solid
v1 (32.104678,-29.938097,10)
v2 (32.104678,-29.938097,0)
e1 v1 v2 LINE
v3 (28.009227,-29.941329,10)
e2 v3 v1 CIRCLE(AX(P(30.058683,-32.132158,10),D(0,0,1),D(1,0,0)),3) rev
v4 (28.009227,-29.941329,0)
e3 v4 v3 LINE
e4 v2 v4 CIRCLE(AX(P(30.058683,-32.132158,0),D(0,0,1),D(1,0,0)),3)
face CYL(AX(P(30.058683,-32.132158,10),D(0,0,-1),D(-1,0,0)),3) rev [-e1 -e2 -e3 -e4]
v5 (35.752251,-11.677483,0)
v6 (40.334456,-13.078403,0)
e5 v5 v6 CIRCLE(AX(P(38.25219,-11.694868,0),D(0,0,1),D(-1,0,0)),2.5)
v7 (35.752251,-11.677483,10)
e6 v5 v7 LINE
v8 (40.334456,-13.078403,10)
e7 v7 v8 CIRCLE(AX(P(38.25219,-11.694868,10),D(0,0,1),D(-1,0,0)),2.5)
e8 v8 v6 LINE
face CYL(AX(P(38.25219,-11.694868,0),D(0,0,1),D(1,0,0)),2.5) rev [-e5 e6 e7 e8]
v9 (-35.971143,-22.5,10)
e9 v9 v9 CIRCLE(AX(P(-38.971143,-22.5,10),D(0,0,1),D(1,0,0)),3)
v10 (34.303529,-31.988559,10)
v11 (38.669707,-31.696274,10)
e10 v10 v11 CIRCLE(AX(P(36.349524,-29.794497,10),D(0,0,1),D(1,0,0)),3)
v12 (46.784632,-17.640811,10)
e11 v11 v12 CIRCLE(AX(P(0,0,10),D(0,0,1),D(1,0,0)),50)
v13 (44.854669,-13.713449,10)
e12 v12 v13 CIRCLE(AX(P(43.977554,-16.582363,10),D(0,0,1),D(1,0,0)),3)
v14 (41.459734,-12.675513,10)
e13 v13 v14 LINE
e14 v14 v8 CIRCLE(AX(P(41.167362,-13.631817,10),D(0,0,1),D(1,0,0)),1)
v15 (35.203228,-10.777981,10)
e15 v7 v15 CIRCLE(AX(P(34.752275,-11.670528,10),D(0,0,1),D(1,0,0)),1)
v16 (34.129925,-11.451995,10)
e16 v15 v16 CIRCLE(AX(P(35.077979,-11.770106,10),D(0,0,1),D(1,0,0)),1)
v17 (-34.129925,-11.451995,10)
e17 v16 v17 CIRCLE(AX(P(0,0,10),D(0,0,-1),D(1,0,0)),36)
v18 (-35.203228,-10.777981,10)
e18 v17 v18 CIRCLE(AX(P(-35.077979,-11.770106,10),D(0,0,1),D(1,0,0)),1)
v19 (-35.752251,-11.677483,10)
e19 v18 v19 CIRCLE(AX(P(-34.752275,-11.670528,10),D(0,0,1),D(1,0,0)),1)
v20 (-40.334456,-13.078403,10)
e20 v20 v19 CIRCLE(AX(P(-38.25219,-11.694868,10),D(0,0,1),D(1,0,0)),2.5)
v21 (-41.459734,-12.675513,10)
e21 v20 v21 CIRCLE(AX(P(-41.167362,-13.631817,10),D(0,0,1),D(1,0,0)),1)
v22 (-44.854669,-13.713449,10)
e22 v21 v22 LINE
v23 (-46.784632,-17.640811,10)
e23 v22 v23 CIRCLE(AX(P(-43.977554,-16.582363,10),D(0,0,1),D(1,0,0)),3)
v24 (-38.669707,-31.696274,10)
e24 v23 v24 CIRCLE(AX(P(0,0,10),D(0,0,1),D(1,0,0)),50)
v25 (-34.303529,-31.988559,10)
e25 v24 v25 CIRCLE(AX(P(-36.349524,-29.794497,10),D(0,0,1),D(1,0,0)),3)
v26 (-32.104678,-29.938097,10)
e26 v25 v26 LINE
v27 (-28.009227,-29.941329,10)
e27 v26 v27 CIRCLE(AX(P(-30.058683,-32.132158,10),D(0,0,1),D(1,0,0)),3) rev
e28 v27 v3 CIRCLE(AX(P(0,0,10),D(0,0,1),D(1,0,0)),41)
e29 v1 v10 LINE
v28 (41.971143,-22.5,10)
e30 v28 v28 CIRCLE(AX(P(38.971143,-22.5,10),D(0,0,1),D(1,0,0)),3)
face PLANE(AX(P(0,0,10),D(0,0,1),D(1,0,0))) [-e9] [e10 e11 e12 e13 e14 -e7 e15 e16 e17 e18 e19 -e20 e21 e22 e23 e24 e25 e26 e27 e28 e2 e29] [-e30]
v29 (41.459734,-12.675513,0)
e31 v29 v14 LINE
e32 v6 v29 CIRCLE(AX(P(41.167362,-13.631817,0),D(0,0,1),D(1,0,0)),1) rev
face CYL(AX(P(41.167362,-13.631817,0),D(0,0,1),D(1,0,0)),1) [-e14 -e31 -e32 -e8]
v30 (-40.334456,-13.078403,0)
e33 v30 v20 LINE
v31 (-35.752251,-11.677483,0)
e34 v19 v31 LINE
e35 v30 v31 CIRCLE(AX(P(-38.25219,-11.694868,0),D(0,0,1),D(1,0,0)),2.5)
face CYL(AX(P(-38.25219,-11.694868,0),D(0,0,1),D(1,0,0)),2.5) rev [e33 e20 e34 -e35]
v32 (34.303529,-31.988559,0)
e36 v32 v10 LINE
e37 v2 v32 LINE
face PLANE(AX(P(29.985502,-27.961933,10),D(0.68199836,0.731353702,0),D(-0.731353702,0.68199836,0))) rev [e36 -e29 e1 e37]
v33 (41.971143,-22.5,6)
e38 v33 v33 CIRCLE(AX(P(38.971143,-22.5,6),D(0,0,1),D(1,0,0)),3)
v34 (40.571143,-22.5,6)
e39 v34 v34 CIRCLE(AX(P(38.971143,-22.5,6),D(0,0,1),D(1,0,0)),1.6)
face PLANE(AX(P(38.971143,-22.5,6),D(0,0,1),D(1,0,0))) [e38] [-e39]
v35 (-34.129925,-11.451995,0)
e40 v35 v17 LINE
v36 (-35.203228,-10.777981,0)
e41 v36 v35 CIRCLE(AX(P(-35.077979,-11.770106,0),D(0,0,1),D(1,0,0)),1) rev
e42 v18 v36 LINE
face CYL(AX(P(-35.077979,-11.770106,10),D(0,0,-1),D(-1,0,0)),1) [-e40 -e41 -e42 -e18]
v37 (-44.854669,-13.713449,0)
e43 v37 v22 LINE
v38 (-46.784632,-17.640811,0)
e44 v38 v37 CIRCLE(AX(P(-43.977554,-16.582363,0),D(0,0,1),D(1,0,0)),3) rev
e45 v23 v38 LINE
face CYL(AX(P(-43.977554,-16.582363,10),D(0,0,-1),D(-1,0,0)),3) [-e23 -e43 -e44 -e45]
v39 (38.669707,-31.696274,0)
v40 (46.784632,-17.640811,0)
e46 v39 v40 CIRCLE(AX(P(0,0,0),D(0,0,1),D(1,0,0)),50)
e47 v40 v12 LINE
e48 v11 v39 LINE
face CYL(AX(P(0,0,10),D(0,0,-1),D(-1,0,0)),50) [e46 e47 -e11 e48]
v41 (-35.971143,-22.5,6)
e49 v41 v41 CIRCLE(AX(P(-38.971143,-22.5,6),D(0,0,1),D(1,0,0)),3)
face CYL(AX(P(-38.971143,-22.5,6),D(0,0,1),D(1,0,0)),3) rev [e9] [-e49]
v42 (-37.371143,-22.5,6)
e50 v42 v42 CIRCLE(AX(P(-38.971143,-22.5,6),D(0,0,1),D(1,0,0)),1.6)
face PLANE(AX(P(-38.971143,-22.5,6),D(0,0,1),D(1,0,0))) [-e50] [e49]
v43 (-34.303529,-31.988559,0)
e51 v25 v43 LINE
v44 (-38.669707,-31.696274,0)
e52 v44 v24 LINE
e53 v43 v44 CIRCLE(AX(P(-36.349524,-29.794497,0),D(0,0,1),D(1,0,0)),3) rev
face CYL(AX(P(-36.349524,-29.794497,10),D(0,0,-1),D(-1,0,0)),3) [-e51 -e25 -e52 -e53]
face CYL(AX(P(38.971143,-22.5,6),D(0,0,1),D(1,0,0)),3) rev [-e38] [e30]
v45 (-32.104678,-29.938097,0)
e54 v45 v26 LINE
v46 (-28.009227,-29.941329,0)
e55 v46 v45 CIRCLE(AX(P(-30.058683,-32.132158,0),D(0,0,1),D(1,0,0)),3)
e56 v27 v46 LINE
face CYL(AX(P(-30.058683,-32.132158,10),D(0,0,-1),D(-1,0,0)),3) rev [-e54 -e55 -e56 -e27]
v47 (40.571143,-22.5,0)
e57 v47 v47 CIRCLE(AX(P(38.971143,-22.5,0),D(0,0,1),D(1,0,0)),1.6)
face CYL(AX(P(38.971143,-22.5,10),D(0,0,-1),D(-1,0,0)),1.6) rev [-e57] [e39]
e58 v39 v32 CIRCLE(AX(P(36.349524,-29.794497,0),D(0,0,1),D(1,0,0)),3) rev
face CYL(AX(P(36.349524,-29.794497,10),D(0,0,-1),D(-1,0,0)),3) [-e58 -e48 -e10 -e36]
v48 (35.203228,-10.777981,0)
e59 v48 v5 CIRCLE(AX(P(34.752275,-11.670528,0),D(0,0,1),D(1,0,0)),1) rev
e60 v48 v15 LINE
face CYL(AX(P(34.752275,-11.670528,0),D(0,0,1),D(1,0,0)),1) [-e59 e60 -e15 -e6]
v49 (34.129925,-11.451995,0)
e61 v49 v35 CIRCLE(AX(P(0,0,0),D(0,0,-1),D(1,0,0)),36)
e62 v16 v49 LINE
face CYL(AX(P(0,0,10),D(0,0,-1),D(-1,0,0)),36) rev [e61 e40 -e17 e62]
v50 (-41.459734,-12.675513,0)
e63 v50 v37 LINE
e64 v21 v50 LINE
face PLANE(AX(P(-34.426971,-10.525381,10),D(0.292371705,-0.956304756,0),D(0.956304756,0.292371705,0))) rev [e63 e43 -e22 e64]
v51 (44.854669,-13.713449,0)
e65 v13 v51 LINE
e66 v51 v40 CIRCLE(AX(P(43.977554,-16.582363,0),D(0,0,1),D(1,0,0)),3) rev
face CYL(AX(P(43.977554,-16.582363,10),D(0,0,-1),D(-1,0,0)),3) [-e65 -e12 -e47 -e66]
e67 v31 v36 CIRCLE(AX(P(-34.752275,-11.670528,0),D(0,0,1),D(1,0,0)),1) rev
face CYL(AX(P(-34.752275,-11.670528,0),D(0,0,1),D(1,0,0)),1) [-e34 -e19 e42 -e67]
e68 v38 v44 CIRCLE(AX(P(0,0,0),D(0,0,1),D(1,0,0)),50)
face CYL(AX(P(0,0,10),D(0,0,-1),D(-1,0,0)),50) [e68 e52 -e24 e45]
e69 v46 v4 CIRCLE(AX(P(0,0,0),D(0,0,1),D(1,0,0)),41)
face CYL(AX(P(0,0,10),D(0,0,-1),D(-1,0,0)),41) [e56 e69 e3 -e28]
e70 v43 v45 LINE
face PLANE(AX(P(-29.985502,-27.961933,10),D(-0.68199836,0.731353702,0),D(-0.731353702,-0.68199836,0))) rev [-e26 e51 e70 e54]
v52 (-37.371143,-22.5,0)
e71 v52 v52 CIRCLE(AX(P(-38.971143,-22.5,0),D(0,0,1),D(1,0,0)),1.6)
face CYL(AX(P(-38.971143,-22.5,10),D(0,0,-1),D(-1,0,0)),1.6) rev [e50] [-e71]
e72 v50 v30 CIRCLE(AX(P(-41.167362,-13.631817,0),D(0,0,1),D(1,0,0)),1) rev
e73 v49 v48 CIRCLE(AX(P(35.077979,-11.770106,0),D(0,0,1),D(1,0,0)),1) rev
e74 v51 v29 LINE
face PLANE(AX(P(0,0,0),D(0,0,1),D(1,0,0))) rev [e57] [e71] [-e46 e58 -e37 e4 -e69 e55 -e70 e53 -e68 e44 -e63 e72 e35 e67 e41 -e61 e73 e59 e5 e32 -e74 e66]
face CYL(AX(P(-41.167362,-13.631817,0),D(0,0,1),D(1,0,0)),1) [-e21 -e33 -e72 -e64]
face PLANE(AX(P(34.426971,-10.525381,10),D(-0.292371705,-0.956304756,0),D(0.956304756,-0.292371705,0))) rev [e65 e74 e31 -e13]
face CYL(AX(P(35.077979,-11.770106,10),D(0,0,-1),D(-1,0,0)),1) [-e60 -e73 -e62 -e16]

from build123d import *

# Parameters (mm, degrees)
SKETCH_1_R          = 1.6
EXTRUDE_1_DEPTH     = 10
SKETCH_2_R          = 2.5
CUT_EXTRUDE_1_DEPTH = 64.775363313
SKETCH_3_R          = 3
CUT_EXTRUDE_2_DEPTH = 4
FILLET_4_R          = 1
FILLET_5_R          = 3


with BuildPart() as part:
    # 草图1 → 凸台-拉伸1 (new body)
    with BuildSketch(Plane.XY):
        with BuildLine():
            Line((-34.426971215, -10.52538137), (-47.815237798, -14.618585236))
            ThreePointArc((-47.815237798, -14.618585236), (-43.301270189, -25), (-36.567685081, -34.099918003))
            Line((-36.567685081, -34.099918003), (-29.985501766, -27.961932763))
            ThreePointArc((-29.985501766, -27.961932763), (0, -41), (29.985501766, -27.961932763))
            Line((29.985501766, -27.961932763), (36.567685081, -34.099918003))
            ThreePointArc((36.567685081, -34.099918003), (43.301270189, -25), (47.815237798, -14.618585236))
            Line((47.815237798, -14.618585236), (34.426971215, -10.52538137))
            ThreePointArc((34.426971215, -10.52538137), (0, -36), (-34.426971215, -10.52538137))
        make_face()
        with Locations((-38.97114317, -22.5)):
            Circle(SKETCH_1_R, mode=Mode.SUBTRACT)
        with Locations((38.97114317, -22.5)):
            Circle(SKETCH_1_R, mode=Mode.SUBTRACT)
    extrude(amount=EXTRUDE_1_DEPTH)

    # 草图2 → 切除-拉伸1 (cut, through all)
    with BuildSketch(Plane.XY.offset(10)):
        with Locations((-38.252190239, -11.694868189)):
            Circle(SKETCH_2_R)
        with Locations((38.252190239, -11.694868189)):
            Circle(SKETCH_2_R)
    extrude(amount=-CUT_EXTRUDE_1_DEPTH, mode=Mode.SUBTRACT)

    # 草图3 → 切除-拉伸2 (cut)
    with BuildSketch(Plane.XY.offset(10)):
        with Locations((-38.97114317, -22.5)):
            Circle(SKETCH_3_R)
        with Locations((38.97114317, -22.5)):
            Circle(SKETCH_3_R)
    extrude(amount=-CUT_EXTRUDE_2_DEPTH, mode=Mode.SUBTRACT)

    # 圆角4
    # the kernel refuses this fillet: 1 mm, written as the material it takes off along each edge
    with BuildSketch(Plane(origin=(-34.426971215, -10.52538137, -2.466210045), x_dir=(-0.9563047559630324, -0.2923717047227467, 0), z_dir=(0, 0, 1))) as fillet_4_piece_1:
        with BuildLine():
            CenterArc((0.986484018, 1), FILLET_4_R, 181.548723167, 88.451276833)
            ThreePointArc((-0.013150685, 0.972972973), (-0.003287821, 0.486530921), (0, 0))
            Line((0, 0), (0.986484018, 0))
        make_face()
    extrude(amount=14.932420089, mode=Mode.SUBTRACT)
    with BuildSketch(Plane(origin=(34.426971215, -10.52538137, -2.466210045), x_dir=(-0.30526922048074906, -0.9522660883529749, 0), z_dir=(0, 0, 1))) as fillet_4_piece_2:
        with BuildLine():
            CenterArc((0.986576589, 0.999908672), FILLET_4_R, 180.774361584, 88.451276833)
            Line((-0.013332083, 0.986393924), (0, 0))
            ThreePointArc((0, 0), (0.486530921, 0.003287821), (0.973061841, 0))
        make_face()
    extrude(amount=14.932420089, mode=Mode.SUBTRACT)
    with BuildSketch(Plane(origin=(-40.642952128, -12.425797451, -2.135254916), x_dir=(0.42737008907787555, -0.9040767705021342, 0), z_dir=(0, 0, 1)), Plane(origin=(35.861428349, -10.963938927, -2.135254916), x_dir=(-0.1512474530257889, -0.9884959321885001, 0), z_dir=(0, 0, 1))) as fillet_4_piece_3:
        with BuildLine():
            CenterArc((0.866217493, -0.989523837), FILLET_4_R, 98.3007748, 73.398450401)
            Line((-0.123306344, -0.845154255), (0, 0))
            ThreePointArc((0, 0), (0.360923955, -0.026190408), (0.721847911, 0))
        make_face()
    extrude(amount=14.270509831, mode=Mode.SUBTRACT)
    with BuildSketch(Plane(origin=(-35.861428349, -10.963938927, -2.135254916), x_dir=(0.9563047559630329, 0.29237170472274493, 0), z_dir=(0, 0, 1)), Plane(origin=(40.642952128, -12.425797451, -2.135254916), x_dir=(0.9563047559630371, -0.2923717047227312, 0), z_dir=(0, 0, 1))) as fillet_4_piece_4:
        with BuildLine():
            CenterArc((0.854101966, -1), FILLET_4_R, 90, 73.398450401)
            ThreePointArc((-0.104212881, -0.714285714), (-0.026190408, -0.360923955), (0, 0))
            Line((0, 0), (0.854101966, 0))
        make_face()
    extrude(amount=14.270509831, mode=Mode.SUBTRACT)

    # 圆角5
    fillet_5_edges = [part.edges().sort_by_distance(p)[0] for p in [
        (-47.815237798, -14.618585236, 5),
        (47.815237798, -14.618585236, 5),
        (36.567685081, -34.099918003, 5),
        (29.985501766, -27.961932763, 5),
        (-29.985501766, -27.961932763, 5),
        (-36.567685081, -34.099918003, 5),
    ]]
    fillet(fillet_5_edges, radius=FILLET_5_R)


solid = part.part
